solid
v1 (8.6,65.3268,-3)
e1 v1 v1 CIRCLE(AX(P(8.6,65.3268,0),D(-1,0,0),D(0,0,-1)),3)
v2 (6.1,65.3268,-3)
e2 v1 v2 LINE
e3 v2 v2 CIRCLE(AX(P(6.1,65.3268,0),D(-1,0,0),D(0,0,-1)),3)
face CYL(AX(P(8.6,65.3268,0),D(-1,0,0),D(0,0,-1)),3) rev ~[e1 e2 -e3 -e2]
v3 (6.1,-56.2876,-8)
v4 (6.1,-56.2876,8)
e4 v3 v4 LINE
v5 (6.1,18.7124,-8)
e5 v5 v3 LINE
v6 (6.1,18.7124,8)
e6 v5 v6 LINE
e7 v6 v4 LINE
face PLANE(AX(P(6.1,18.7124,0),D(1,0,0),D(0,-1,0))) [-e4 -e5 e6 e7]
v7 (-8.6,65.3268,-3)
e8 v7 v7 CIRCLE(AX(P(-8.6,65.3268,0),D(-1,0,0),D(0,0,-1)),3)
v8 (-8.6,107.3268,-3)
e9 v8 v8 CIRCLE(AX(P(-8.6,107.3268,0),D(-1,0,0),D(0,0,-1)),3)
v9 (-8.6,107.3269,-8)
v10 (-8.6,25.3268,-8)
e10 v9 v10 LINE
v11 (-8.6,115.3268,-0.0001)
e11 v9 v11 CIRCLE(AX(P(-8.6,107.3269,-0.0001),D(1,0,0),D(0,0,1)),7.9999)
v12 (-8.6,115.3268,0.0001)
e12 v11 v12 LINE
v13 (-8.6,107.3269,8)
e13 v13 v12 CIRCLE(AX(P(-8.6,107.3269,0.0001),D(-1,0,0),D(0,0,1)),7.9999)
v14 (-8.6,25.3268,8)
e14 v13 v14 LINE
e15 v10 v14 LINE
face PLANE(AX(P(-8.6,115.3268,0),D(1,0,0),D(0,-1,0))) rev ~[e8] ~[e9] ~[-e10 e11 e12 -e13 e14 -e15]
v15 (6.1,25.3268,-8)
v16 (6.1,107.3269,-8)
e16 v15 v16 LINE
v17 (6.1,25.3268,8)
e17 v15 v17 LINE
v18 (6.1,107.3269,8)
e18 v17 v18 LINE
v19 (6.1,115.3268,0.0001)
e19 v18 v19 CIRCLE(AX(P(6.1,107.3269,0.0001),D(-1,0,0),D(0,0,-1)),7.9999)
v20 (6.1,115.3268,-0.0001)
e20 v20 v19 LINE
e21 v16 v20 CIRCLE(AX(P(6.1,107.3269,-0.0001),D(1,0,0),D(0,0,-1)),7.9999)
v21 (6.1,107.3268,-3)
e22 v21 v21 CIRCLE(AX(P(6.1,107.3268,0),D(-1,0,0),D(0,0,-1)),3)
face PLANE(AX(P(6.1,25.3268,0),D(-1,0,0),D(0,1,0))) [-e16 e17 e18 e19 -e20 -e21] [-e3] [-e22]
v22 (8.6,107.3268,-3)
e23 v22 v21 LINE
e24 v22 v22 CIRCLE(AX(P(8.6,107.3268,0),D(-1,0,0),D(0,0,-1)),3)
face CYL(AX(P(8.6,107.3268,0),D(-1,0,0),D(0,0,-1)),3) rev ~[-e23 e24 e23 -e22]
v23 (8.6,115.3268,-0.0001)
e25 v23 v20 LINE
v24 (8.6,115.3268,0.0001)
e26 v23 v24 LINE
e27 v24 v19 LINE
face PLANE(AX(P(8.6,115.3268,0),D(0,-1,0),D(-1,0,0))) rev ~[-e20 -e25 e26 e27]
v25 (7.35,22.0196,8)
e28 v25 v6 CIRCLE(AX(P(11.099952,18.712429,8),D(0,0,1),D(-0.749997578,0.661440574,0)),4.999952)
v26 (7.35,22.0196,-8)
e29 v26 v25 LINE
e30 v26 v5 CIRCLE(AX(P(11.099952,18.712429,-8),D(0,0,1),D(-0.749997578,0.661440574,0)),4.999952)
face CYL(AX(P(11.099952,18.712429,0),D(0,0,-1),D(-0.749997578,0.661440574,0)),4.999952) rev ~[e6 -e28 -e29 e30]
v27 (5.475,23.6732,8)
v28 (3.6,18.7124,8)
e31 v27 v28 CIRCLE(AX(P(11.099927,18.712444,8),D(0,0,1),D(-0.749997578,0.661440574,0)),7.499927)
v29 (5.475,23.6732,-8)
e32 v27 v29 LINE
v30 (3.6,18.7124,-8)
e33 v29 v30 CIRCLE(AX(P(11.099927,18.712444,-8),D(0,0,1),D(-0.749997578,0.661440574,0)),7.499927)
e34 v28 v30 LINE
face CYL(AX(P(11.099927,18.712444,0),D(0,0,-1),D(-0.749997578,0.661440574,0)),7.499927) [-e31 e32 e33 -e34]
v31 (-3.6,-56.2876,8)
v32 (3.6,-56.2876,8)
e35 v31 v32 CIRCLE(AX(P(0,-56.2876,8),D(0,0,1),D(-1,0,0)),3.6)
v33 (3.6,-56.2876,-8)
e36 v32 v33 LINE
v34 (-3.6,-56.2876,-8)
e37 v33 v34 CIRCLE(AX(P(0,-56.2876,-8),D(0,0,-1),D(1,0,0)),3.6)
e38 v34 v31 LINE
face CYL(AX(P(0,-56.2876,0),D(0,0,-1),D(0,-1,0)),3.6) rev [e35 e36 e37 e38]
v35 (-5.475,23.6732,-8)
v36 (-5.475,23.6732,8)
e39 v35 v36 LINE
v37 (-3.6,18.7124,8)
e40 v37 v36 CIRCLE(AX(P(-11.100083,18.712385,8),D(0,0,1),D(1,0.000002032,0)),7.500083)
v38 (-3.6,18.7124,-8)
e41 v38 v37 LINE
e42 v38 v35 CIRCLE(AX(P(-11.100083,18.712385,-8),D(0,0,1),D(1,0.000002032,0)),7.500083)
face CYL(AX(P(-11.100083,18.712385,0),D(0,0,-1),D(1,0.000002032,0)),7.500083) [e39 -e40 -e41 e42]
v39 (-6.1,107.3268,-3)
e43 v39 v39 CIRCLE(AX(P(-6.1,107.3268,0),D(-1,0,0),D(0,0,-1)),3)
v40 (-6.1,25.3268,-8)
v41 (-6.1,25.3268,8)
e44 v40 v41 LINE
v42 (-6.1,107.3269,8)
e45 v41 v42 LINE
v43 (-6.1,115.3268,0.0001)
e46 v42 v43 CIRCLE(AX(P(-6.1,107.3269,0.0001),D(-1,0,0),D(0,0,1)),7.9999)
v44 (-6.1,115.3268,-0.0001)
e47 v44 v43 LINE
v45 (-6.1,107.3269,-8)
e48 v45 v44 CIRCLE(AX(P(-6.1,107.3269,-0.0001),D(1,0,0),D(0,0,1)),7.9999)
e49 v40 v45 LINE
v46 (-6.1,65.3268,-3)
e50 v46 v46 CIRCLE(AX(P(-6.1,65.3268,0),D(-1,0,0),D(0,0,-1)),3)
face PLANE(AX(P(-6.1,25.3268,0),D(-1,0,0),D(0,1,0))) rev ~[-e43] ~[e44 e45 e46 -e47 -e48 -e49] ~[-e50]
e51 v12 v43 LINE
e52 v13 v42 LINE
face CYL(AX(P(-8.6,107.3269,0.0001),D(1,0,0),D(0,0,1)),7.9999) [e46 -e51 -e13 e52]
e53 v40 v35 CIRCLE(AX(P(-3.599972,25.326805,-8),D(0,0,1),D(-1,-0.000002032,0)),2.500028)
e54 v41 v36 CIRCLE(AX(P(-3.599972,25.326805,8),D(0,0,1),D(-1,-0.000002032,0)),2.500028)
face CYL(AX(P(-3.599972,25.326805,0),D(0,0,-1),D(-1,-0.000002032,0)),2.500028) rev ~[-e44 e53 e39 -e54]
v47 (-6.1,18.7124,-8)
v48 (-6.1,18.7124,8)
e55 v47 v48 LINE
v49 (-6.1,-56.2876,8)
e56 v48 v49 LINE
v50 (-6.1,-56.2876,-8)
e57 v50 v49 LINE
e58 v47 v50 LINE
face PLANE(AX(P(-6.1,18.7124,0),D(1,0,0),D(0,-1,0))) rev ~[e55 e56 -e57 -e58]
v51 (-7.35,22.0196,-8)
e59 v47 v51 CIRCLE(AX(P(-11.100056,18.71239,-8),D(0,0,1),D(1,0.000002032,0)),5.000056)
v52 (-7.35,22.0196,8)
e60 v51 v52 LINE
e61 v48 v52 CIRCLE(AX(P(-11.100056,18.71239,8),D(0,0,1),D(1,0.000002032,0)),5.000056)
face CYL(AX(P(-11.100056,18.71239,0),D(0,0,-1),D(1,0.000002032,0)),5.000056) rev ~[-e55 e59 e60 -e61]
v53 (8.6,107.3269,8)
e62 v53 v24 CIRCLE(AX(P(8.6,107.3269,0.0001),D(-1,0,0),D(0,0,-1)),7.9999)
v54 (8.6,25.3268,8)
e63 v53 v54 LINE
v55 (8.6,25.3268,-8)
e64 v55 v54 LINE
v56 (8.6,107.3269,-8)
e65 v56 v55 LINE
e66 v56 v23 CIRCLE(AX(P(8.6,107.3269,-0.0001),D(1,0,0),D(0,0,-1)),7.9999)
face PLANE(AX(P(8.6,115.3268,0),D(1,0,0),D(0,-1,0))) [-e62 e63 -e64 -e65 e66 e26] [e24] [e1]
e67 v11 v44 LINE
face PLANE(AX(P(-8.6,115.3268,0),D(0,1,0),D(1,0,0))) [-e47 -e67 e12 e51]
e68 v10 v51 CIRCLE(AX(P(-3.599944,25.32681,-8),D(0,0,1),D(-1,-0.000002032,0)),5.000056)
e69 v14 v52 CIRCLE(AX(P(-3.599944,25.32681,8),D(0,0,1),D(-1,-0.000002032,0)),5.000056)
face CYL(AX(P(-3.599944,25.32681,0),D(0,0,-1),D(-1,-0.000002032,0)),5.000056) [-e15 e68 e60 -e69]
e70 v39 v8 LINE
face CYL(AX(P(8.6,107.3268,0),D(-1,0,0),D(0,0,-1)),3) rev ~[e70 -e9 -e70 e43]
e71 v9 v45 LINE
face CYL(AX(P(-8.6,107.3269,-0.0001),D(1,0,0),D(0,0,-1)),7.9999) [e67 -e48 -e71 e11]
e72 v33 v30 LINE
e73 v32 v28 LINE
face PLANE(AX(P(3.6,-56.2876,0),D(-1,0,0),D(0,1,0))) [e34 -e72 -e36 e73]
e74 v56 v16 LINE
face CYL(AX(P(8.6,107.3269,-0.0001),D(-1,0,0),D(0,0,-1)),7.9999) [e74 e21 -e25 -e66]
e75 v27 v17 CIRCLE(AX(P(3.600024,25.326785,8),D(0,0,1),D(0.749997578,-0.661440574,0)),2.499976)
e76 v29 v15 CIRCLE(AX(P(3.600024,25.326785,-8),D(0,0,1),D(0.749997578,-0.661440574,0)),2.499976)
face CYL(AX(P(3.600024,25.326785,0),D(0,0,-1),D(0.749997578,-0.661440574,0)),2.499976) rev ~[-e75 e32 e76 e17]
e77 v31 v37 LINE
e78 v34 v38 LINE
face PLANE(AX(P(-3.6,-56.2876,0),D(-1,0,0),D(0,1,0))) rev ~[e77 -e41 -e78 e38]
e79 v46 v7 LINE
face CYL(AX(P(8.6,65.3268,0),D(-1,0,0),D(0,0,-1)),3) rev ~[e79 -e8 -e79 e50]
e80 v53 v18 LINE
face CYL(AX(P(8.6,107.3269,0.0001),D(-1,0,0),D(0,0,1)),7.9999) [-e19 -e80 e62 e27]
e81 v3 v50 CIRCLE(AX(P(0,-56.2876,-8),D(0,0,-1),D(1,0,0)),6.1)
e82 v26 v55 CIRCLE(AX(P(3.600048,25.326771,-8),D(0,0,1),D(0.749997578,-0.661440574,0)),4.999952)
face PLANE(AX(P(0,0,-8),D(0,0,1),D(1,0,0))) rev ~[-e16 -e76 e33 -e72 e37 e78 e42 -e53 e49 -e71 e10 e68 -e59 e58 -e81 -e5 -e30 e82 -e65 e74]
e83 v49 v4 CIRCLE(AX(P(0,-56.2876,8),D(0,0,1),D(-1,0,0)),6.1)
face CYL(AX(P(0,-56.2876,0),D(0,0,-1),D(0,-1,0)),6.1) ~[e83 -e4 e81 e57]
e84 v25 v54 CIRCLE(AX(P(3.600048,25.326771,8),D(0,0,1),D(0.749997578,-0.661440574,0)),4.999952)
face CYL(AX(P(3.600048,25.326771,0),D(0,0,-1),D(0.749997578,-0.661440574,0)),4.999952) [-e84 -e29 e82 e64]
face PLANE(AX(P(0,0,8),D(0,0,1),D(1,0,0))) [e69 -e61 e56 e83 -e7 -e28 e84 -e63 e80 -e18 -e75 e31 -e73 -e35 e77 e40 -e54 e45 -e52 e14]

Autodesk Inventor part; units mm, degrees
ref_plane "YZ Plane" through (0, 0, 0) normal (1, 0, 0) x (0, 1, 0)
ref_plane "XZ Plane" through (0, 0, 0) normal (0, 1, 0) x (-1, 0, 0)
ref_plane "XY Plane" through (0, 0, 0) normal (0, 0, 1) x (1, 0, 0)
sketch "Sketch1" plane through (0, 0, 0) normal (0, 0, 1) x (1, 0, 0)
  line L0 (0, 104.6011) -> (0, -104.6011)
  line L1 (-8.6, 115.3268) -> (-8.6, 25.3268)
  arc A0 (-8.6, 25.3268) -> (-7.35, 22.0196) centre (-3.6, 25.3268) ccw
  arc A1 (-6.1, 18.7124) -> (-7.35, 22.0196) centre (-11.1, 18.7124) ccw
  line L2 (-6.1, 18.7124) -> (-6.1, -56.2876)
  arc A2 (-6.1, -56.2876) -> (0, -62.3876) centre (0, -56.2876) ccw
  arc A3 (-3.6, -56.2876) -> (0, -59.8876) centre (0, -56.2876) ccw
  line L3 (-3.6, -56.2876) -> (-3.6, 18.7124)
  arc A4 (-3.6, 18.7124) -> (-5.475, 23.6732) centre (-11.1, 18.7124) ccw
  arc A5 (-6.1, 25.3268) -> (-5.475, 23.6732) centre (-3.6, 25.3268) ccw
  line L4 (-6.1, 25.3268) -> (-6.1, 115.3268)
  line L5 (-8.6, 115.3268) -> (-6.1, 115.3268)
  line L6 (8.6, 115.3268) -> (8.6, 25.3268)
  arc A6 (7.35, 22.0196) -> (8.6, 25.3268) centre (3.6, 25.3268) ccw
  arc A7 (7.35, 22.0196) -> (6.1, 18.7124) centre (11.1, 18.7124) ccw
  line L7 (6.1, 18.7124) -> (6.1, -56.2876)
  arc A8 (0, -62.3876) -> (6.1, -56.2876) centre (0, -56.2876) ccw
  arc A9 (0, -59.8876) -> (3.6, -56.2876) centre (0, -56.2876) ccw
  line L8 (3.6, -56.2876) -> (3.6, 18.7124)
  arc A10 (5.475, 23.6732) -> (3.6, 18.7124) centre (11.1, 18.7124) ccw
  arc A11 (5.475, 23.6732) -> (6.1, 25.3268) centre (3.6, 25.3268) ccw
  line L9 (6.1, 25.3268) -> (6.1, 115.3268)
  line L10 (8.6, 115.3268) -> (6.1, 115.3268)
  point P0 (0, 0)
  point P1 (0, 0)
  dimension "d0" = 90
  dimension "d1" = 5
  dimension "d2" = 75
  dimension "d3" = 6.1
  dimension "d4" = 6.1
  dimension "d5" = 8.6
  dimension "d6" = 2.5
extrude "Extrusion1" add sketch "Sketch1" along normal mid plane 16
hole "Hole1" at (8.6, 107.3268, 0) direction (-1, 0, 0) diameter 6 depth 30 tip angle 118
hole "Hole2" at (8.6, 65.3268, 0) direction (-1, 0, 0) diameter 6 depth 30 tip angle 118
fillet "Fillet1" radius 8 4 edges at (7.35, 115.3268, -8) (7.35, 115.3268, 8) (-7.35, 115.3268, 8) (-7.35, 115.3268, -8)
equation "\"BendRadius\" = Thickness"
equation "\"BendReliefWidth\" = Thickness"
equation "\"BendReliefDepth\" = 0.5 * Thickness"
equation "\"MinimumRemnant\" = 2 * Thickness"
equation "\"TransitionRadius\" = BendRadius"
equation "\"JacobiRadiusSize\" = BendRadius"
equation "\"GapSize\" = Thickness"
equation "\"Thickness\" = 2.5"
properties material "Iron, Gray"
